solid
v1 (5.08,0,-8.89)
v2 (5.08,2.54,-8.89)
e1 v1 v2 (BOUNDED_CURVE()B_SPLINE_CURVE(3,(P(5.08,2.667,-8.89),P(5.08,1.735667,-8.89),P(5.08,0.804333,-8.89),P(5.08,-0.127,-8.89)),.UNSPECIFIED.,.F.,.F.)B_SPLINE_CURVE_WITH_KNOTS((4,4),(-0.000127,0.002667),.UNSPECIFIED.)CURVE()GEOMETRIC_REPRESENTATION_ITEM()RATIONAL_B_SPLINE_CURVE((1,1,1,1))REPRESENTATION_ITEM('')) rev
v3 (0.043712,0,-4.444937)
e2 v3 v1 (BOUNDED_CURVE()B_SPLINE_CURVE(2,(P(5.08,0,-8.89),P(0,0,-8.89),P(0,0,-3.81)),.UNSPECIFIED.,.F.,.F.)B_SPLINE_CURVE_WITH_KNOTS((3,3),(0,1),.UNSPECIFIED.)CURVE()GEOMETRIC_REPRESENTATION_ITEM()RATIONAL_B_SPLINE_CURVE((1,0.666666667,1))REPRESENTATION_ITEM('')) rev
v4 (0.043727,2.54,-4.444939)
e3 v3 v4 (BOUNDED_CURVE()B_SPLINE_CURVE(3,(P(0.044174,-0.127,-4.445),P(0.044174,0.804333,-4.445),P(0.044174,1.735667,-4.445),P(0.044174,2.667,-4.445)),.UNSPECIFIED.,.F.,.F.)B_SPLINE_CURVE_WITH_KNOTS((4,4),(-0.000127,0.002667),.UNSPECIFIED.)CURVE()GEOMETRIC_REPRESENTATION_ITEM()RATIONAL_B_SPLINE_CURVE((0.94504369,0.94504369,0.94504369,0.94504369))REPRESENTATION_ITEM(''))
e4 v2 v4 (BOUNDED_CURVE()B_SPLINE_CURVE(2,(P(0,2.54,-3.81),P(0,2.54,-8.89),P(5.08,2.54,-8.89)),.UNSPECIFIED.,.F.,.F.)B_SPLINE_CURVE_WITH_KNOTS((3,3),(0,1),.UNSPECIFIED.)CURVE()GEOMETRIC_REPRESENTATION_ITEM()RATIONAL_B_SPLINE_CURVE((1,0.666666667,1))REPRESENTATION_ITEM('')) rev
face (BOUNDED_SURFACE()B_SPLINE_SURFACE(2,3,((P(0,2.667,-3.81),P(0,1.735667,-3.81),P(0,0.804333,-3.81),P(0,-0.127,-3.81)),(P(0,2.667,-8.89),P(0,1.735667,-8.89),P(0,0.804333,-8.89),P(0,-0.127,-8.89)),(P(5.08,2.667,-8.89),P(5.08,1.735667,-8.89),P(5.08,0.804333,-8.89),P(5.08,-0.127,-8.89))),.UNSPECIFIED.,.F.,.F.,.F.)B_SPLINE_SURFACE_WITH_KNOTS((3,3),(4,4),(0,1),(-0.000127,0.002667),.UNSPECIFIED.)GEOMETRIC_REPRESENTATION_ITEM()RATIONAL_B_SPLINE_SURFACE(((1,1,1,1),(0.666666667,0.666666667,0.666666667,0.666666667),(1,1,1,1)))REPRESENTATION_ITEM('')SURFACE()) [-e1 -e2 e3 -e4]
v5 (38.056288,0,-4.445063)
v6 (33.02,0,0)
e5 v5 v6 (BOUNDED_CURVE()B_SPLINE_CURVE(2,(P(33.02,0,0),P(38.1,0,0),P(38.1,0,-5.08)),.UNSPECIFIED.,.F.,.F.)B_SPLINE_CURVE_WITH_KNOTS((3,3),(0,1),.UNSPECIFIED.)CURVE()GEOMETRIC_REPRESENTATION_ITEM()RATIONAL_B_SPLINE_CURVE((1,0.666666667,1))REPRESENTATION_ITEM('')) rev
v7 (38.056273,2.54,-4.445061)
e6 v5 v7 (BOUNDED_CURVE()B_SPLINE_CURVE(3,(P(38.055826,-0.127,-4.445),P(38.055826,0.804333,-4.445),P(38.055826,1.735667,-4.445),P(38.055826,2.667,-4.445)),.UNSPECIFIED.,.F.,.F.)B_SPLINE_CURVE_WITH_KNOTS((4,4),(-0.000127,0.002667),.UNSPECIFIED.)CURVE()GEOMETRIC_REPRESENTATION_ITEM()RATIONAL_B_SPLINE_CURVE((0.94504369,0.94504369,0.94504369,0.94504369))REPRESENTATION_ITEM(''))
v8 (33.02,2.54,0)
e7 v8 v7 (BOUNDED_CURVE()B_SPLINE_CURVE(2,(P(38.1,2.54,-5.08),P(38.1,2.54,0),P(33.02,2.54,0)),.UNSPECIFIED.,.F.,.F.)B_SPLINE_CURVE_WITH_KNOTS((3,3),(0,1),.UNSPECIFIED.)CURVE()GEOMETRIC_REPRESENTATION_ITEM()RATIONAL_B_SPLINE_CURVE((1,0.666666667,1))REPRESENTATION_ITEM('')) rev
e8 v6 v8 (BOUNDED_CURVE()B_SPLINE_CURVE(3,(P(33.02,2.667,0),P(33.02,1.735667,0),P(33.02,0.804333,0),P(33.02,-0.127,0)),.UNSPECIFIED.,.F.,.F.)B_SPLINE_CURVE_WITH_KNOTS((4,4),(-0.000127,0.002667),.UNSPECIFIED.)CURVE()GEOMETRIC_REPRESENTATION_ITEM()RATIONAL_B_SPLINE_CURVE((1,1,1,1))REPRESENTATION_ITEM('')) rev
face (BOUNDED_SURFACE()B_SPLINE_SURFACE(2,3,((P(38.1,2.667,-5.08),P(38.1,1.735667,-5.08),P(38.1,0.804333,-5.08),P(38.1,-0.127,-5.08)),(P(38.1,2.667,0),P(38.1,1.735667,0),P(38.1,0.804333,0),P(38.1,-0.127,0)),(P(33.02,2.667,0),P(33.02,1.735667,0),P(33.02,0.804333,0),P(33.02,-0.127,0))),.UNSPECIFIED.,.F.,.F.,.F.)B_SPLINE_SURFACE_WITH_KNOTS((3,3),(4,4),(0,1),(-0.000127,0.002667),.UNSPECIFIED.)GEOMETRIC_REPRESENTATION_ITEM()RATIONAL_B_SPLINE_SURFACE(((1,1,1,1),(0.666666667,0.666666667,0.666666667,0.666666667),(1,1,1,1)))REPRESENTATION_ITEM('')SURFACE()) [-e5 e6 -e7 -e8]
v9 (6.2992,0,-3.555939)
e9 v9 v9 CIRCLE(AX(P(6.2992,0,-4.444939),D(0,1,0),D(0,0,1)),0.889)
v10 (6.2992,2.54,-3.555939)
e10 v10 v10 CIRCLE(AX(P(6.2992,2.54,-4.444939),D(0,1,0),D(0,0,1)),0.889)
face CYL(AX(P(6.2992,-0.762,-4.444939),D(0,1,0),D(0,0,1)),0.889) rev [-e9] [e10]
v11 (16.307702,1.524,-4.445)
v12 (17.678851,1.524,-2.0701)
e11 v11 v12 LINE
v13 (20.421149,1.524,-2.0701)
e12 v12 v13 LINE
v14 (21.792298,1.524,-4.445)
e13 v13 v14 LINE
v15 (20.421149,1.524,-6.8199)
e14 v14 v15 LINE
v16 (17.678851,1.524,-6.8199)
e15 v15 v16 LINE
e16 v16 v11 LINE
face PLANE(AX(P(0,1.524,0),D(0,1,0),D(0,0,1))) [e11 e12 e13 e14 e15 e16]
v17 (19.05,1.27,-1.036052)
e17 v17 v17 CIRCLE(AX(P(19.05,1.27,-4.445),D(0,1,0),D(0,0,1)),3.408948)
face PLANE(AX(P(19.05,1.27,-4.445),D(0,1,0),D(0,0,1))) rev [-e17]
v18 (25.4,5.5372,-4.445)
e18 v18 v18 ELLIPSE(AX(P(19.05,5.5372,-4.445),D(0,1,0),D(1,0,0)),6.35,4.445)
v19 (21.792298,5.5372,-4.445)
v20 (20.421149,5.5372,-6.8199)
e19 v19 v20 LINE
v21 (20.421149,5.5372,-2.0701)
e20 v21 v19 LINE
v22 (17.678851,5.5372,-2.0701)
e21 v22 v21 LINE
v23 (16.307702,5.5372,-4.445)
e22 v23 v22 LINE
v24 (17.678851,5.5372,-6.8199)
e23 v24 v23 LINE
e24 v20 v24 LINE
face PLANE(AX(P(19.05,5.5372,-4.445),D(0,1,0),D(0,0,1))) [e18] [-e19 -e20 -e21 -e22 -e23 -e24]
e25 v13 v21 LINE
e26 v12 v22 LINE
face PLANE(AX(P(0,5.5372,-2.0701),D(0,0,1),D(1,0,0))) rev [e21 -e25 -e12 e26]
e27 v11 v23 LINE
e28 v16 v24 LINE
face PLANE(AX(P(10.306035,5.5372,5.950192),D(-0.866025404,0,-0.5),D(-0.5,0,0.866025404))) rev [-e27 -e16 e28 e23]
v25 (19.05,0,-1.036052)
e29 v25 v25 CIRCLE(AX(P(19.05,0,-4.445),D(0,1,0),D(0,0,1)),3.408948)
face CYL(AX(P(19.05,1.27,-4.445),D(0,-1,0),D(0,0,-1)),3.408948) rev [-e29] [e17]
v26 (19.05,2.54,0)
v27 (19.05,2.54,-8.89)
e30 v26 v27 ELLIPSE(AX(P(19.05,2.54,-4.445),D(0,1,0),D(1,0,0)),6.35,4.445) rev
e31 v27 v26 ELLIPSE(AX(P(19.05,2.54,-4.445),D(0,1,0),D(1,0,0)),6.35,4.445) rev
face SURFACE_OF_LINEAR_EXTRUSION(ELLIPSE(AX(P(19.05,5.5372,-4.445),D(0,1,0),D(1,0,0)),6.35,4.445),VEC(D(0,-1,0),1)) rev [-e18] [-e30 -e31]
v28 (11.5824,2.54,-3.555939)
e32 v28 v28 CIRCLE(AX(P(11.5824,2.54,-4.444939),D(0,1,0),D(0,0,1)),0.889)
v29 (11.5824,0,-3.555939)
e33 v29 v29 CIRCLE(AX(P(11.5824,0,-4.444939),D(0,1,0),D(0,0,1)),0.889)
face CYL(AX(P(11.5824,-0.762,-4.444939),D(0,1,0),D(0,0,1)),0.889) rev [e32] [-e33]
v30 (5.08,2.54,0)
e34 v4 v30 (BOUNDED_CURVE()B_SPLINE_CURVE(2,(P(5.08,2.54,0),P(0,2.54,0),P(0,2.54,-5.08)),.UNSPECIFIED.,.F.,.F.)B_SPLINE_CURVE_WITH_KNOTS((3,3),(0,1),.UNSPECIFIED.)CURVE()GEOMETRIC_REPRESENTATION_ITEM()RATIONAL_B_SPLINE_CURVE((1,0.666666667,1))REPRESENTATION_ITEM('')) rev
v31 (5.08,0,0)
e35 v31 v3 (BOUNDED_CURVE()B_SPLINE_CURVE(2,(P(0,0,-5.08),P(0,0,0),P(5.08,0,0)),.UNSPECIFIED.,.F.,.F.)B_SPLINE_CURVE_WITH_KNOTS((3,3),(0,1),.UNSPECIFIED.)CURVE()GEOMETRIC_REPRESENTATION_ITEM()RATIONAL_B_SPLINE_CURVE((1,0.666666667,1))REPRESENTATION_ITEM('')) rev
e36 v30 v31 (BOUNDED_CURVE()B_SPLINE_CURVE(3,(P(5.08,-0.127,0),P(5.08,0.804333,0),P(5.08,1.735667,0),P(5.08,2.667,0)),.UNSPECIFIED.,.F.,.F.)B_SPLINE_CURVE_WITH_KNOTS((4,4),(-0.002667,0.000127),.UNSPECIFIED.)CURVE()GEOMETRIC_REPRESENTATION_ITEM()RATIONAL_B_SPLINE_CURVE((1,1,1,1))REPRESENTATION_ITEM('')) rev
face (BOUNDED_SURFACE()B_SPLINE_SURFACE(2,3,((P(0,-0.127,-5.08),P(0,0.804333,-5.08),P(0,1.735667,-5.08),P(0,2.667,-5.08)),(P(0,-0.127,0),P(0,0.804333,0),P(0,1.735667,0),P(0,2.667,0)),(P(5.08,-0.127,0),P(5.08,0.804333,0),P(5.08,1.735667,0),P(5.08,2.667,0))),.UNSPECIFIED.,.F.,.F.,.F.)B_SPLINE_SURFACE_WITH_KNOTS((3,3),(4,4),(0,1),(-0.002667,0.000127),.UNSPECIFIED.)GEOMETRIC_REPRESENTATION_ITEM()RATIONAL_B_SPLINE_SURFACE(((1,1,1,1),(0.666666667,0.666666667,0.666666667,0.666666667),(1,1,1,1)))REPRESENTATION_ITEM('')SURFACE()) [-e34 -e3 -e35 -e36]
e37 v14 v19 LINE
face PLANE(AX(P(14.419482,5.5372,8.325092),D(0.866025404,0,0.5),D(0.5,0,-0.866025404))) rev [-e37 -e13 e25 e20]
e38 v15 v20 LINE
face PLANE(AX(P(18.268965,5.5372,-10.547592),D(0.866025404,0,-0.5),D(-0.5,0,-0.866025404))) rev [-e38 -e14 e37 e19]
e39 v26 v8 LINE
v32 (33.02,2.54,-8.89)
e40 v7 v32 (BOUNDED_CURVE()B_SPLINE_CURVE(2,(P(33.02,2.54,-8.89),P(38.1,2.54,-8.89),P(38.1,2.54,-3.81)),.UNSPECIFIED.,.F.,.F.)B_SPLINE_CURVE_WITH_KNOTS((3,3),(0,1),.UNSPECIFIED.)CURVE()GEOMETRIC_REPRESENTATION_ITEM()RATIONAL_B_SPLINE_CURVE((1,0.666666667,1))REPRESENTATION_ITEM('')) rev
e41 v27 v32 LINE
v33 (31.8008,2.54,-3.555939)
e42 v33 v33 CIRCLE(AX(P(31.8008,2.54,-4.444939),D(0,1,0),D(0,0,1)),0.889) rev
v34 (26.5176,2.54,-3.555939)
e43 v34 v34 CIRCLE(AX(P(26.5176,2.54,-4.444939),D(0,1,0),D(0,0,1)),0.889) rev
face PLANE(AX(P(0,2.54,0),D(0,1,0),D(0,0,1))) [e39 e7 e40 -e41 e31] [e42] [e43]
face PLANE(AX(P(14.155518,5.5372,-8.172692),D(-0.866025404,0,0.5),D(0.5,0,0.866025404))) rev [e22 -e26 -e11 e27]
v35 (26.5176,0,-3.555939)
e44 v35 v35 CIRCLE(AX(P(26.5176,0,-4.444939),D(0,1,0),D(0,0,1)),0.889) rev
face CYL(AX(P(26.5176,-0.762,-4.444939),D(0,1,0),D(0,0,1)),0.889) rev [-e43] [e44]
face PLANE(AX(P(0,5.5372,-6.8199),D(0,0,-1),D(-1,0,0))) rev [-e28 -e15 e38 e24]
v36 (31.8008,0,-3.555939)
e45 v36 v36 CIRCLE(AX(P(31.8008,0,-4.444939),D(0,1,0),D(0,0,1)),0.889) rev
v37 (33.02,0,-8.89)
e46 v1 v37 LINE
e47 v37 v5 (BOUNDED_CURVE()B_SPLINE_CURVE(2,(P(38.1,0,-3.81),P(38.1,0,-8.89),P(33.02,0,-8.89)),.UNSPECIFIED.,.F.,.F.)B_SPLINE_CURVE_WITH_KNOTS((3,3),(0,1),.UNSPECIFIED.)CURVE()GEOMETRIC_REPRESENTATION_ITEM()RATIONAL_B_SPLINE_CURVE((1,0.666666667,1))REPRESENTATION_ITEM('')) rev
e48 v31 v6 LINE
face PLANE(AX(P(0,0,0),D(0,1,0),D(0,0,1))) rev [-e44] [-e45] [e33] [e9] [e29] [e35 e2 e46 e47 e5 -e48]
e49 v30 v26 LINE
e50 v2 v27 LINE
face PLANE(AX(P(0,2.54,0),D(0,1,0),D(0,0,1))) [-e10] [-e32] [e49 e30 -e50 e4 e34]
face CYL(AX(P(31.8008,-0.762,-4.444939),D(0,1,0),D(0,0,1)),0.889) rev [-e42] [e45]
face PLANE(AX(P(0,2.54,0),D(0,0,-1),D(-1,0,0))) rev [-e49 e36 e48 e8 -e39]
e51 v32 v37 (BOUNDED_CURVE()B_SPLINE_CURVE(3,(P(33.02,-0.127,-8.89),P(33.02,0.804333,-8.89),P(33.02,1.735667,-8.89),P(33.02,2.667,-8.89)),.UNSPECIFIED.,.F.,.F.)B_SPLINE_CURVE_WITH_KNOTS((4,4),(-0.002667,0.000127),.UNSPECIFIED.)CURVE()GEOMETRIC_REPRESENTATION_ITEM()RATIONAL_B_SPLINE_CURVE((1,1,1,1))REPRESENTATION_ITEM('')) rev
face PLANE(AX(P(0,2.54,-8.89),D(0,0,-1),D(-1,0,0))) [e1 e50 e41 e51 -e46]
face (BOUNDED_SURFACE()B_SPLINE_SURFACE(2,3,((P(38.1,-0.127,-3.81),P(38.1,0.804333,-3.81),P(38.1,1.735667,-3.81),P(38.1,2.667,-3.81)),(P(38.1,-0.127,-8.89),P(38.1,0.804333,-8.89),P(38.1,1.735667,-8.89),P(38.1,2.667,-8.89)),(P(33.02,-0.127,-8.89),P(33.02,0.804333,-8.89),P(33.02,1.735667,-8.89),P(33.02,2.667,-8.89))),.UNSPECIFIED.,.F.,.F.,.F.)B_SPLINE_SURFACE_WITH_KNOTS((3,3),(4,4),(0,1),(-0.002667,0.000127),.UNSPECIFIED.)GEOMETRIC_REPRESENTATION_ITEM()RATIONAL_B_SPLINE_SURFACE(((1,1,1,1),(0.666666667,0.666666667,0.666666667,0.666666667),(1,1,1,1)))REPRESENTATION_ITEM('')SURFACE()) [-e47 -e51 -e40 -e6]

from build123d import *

# Parameters (mm, degrees)
SKETCH1_W               = 38.1
SKETCH1_H               = 8.89
BOSS_EXTRUDE1_DEPTH     = 2.54
FILLET1_SIZE            = 5.08
BOSS_EXTRUDE2_START     = 0.508
SKETCH1_7_RX            = 6.35
SKETCH1_7_RY            = 4.445
BOSS_EXTRUDE2_DEPTH     = 5.0292
CUT_EXTRUDE2_DEPTH      = 40.51332301
CUT_EXTRUDE2_DEPTH_BACK = 5.08
CUT_EXTRUDE2_START      = 6.604
CUT_EXTRUDE3_START      = 1.778
SKETCH2_R               = 0.889
CUT_EXTRUDE3_DEPTH      = 5.08
FILLET2_SIZE            = 5.08
SKETCH6_R               = 3.408948418
CUT_EXTRUDE6_DEPTH      = 1.27
SKETCH2_AGAIN_R         = 0.889
CUT_EXTRUDE5_DEPTH      = 1.2


with BuildPart() as part:
    # Sketch1 → Boss-Extrude1 (new body)
    with BuildSketch(Plane(origin=(0, 0, 0), x_dir=(1, 0, 0), z_dir=(0, 1, 0))):
        with Locations((19.05, 4.445)):
            Rectangle(SKETCH1_W, SKETCH1_H)
        Polygon((20.421149154, 2.0701), (21.792298309, 4.445), (20.421149154, 6.8199), (17.678850846, 6.8199), (16.307701691, 4.445), (17.678850846, 2.0701), align=None, mode=Mode.SUBTRACT)
    extrude(amount=BOSS_EXTRUDE1_DEPTH)

    # Fillet1
    # a fillet whose section is not a circle: 5.08 mm, written as the material it takes off along each edge
    with BuildSketch(Plane(origin=(0, -12.7, -8.89), x_dir=(1, 0, 0), z_dir=(0, 1, 0))) as fillet1_piece_1:
        with BuildLine():
            Bezier((FILLET1_SIZE, 0), (0, 0), (0, -FILLET1_SIZE), weights=[1, 0.666666667, 1])
            Line((0, -FILLET1_SIZE), (0, 0))
            Line((0, 0), (FILLET1_SIZE, 0))
        make_face()
    extrude(amount=27.94, mode=Mode.SUBTRACT)
    with BuildSketch(Plane(origin=(0, -12.7, 0), x_dir=(1, 0, 0), z_dir=(0, 1, 0))) as fillet1_piece_2:
        with BuildLine():
            Bezier((FILLET1_SIZE, 0), (0, 0), (0, FILLET1_SIZE), weights=[1, 0.666666667, 1])
            Line((0, FILLET1_SIZE), (0, 0))
            Line((0, 0), (FILLET1_SIZE, 0))
        make_face()
    extrude(amount=27.94, mode=Mode.SUBTRACT)

    # Sketch1<7> → Boss-Extrude2 (add)
    with BuildSketch(Plane(origin=(0, 0, 0), x_dir=(1, 0, 0), z_dir=(0, 1, 0)).offset(BOSS_EXTRUDE2_START)):
        with Locations(Location((19.05, 4.445), (0, 0, 0))):
            Ellipse(SKETCH1_7_RX, SKETCH1_7_RY)
    extrude(amount=BOSS_EXTRUDE2_DEPTH)

    # Sketch1<8> → Cut-Extrude2 (cut, two sides: drawn at the far end of the back side and taken through both)
    with BuildSketch(Plane(origin=(0, 0, 0), x_dir=(1, 0, 0), z_dir=(0, 1, 0)).offset(CUT_EXTRUDE2_START - CUT_EXTRUDE2_DEPTH_BACK)):
        Polygon((20.421149154, 2.0701), (21.792298309, 4.445), (20.421149154, 6.8199), (17.678850846, 6.8199), (16.307701691, 4.445), (17.678850846, 2.0701), align=None)
    extrude(amount=CUT_EXTRUDE2_DEPTH + CUT_EXTRUDE2_DEPTH_BACK, mode=Mode.SUBTRACT)

    # Sketch2 → Cut-Extrude3 (cut)
    with BuildSketch(Plane(origin=(0, 2.54, 0), x_dir=(1, 0, 0), z_dir=(0, 1, 0)).offset(CUT_EXTRUDE3_START)):
        with Locations(Location((11.5824, 4.444938661, 0), (0, 0, 270))):
            Circle(SKETCH2_R)
        with Locations(Location((6.2992, 4.444938661, 0), (0, 0, 270))):
            Circle(SKETCH2_R)
        with Locations(Location((26.5176, 4.444938661, 0), (0, 0, 270))):
            Circle(SKETCH2_R)
        with Locations(Location((31.8008, 4.444938661, 0), (0, 0, 270))):
            Circle(SKETCH2_R)
    extrude(amount=-CUT_EXTRUDE3_DEPTH, mode=Mode.SUBTRACT)

    # Fillet2
    # a fillet whose section is not a circle: 5.08 mm, written as the material it takes off along each edge
    with BuildSketch(Plane(origin=(38.1, -12.7, 0), x_dir=(-1, 0, 0), z_dir=(0, 1, 0)), Plane(origin=(38.1, -12.7, -8.89), x_dir=(0, 0, 1), z_dir=(0, 1, 0))) as fillet2_piece_1:
        with BuildLine():
            Bezier((FILLET2_SIZE, 0), (0, 0), (0, -FILLET2_SIZE), weights=[1, 0.666666667, 1])
            Line((0, -FILLET2_SIZE), (0, 0))
            Line((0, 0), (FILLET2_SIZE, 0))
        make_face()
    extrude(amount=27.94, mode=Mode.SUBTRACT)

    # Sketch6 → Cut-Extrude6 (cut)
    with BuildSketch(Plane(origin=(0, 0, 0), x_dir=(1, 0, 0), z_dir=(0, 1, 0))):
        with Locations(Location((19.05, 4.445, 0), (0, 0, 270))):
            Circle(SKETCH6_R)
    extrude(amount=CUT_EXTRUDE6_DEPTH, mode=Mode.SUBTRACT)

    # Sketch2 again → Cut-Extrude5 (cut)
    with BuildSketch(Plane(origin=(0, 2.54, 0), x_dir=(1, 0, 0), z_dir=(0, 1, 0))):
        with Locations(Location((26.5176, 4.444938661, 0), (0, 0, 270))):
            Circle(SKETCH2_AGAIN_R)
    extrude(amount=-CUT_EXTRUDE5_DEPTH, mode=Mode.SUBTRACT)


solid = part.part
